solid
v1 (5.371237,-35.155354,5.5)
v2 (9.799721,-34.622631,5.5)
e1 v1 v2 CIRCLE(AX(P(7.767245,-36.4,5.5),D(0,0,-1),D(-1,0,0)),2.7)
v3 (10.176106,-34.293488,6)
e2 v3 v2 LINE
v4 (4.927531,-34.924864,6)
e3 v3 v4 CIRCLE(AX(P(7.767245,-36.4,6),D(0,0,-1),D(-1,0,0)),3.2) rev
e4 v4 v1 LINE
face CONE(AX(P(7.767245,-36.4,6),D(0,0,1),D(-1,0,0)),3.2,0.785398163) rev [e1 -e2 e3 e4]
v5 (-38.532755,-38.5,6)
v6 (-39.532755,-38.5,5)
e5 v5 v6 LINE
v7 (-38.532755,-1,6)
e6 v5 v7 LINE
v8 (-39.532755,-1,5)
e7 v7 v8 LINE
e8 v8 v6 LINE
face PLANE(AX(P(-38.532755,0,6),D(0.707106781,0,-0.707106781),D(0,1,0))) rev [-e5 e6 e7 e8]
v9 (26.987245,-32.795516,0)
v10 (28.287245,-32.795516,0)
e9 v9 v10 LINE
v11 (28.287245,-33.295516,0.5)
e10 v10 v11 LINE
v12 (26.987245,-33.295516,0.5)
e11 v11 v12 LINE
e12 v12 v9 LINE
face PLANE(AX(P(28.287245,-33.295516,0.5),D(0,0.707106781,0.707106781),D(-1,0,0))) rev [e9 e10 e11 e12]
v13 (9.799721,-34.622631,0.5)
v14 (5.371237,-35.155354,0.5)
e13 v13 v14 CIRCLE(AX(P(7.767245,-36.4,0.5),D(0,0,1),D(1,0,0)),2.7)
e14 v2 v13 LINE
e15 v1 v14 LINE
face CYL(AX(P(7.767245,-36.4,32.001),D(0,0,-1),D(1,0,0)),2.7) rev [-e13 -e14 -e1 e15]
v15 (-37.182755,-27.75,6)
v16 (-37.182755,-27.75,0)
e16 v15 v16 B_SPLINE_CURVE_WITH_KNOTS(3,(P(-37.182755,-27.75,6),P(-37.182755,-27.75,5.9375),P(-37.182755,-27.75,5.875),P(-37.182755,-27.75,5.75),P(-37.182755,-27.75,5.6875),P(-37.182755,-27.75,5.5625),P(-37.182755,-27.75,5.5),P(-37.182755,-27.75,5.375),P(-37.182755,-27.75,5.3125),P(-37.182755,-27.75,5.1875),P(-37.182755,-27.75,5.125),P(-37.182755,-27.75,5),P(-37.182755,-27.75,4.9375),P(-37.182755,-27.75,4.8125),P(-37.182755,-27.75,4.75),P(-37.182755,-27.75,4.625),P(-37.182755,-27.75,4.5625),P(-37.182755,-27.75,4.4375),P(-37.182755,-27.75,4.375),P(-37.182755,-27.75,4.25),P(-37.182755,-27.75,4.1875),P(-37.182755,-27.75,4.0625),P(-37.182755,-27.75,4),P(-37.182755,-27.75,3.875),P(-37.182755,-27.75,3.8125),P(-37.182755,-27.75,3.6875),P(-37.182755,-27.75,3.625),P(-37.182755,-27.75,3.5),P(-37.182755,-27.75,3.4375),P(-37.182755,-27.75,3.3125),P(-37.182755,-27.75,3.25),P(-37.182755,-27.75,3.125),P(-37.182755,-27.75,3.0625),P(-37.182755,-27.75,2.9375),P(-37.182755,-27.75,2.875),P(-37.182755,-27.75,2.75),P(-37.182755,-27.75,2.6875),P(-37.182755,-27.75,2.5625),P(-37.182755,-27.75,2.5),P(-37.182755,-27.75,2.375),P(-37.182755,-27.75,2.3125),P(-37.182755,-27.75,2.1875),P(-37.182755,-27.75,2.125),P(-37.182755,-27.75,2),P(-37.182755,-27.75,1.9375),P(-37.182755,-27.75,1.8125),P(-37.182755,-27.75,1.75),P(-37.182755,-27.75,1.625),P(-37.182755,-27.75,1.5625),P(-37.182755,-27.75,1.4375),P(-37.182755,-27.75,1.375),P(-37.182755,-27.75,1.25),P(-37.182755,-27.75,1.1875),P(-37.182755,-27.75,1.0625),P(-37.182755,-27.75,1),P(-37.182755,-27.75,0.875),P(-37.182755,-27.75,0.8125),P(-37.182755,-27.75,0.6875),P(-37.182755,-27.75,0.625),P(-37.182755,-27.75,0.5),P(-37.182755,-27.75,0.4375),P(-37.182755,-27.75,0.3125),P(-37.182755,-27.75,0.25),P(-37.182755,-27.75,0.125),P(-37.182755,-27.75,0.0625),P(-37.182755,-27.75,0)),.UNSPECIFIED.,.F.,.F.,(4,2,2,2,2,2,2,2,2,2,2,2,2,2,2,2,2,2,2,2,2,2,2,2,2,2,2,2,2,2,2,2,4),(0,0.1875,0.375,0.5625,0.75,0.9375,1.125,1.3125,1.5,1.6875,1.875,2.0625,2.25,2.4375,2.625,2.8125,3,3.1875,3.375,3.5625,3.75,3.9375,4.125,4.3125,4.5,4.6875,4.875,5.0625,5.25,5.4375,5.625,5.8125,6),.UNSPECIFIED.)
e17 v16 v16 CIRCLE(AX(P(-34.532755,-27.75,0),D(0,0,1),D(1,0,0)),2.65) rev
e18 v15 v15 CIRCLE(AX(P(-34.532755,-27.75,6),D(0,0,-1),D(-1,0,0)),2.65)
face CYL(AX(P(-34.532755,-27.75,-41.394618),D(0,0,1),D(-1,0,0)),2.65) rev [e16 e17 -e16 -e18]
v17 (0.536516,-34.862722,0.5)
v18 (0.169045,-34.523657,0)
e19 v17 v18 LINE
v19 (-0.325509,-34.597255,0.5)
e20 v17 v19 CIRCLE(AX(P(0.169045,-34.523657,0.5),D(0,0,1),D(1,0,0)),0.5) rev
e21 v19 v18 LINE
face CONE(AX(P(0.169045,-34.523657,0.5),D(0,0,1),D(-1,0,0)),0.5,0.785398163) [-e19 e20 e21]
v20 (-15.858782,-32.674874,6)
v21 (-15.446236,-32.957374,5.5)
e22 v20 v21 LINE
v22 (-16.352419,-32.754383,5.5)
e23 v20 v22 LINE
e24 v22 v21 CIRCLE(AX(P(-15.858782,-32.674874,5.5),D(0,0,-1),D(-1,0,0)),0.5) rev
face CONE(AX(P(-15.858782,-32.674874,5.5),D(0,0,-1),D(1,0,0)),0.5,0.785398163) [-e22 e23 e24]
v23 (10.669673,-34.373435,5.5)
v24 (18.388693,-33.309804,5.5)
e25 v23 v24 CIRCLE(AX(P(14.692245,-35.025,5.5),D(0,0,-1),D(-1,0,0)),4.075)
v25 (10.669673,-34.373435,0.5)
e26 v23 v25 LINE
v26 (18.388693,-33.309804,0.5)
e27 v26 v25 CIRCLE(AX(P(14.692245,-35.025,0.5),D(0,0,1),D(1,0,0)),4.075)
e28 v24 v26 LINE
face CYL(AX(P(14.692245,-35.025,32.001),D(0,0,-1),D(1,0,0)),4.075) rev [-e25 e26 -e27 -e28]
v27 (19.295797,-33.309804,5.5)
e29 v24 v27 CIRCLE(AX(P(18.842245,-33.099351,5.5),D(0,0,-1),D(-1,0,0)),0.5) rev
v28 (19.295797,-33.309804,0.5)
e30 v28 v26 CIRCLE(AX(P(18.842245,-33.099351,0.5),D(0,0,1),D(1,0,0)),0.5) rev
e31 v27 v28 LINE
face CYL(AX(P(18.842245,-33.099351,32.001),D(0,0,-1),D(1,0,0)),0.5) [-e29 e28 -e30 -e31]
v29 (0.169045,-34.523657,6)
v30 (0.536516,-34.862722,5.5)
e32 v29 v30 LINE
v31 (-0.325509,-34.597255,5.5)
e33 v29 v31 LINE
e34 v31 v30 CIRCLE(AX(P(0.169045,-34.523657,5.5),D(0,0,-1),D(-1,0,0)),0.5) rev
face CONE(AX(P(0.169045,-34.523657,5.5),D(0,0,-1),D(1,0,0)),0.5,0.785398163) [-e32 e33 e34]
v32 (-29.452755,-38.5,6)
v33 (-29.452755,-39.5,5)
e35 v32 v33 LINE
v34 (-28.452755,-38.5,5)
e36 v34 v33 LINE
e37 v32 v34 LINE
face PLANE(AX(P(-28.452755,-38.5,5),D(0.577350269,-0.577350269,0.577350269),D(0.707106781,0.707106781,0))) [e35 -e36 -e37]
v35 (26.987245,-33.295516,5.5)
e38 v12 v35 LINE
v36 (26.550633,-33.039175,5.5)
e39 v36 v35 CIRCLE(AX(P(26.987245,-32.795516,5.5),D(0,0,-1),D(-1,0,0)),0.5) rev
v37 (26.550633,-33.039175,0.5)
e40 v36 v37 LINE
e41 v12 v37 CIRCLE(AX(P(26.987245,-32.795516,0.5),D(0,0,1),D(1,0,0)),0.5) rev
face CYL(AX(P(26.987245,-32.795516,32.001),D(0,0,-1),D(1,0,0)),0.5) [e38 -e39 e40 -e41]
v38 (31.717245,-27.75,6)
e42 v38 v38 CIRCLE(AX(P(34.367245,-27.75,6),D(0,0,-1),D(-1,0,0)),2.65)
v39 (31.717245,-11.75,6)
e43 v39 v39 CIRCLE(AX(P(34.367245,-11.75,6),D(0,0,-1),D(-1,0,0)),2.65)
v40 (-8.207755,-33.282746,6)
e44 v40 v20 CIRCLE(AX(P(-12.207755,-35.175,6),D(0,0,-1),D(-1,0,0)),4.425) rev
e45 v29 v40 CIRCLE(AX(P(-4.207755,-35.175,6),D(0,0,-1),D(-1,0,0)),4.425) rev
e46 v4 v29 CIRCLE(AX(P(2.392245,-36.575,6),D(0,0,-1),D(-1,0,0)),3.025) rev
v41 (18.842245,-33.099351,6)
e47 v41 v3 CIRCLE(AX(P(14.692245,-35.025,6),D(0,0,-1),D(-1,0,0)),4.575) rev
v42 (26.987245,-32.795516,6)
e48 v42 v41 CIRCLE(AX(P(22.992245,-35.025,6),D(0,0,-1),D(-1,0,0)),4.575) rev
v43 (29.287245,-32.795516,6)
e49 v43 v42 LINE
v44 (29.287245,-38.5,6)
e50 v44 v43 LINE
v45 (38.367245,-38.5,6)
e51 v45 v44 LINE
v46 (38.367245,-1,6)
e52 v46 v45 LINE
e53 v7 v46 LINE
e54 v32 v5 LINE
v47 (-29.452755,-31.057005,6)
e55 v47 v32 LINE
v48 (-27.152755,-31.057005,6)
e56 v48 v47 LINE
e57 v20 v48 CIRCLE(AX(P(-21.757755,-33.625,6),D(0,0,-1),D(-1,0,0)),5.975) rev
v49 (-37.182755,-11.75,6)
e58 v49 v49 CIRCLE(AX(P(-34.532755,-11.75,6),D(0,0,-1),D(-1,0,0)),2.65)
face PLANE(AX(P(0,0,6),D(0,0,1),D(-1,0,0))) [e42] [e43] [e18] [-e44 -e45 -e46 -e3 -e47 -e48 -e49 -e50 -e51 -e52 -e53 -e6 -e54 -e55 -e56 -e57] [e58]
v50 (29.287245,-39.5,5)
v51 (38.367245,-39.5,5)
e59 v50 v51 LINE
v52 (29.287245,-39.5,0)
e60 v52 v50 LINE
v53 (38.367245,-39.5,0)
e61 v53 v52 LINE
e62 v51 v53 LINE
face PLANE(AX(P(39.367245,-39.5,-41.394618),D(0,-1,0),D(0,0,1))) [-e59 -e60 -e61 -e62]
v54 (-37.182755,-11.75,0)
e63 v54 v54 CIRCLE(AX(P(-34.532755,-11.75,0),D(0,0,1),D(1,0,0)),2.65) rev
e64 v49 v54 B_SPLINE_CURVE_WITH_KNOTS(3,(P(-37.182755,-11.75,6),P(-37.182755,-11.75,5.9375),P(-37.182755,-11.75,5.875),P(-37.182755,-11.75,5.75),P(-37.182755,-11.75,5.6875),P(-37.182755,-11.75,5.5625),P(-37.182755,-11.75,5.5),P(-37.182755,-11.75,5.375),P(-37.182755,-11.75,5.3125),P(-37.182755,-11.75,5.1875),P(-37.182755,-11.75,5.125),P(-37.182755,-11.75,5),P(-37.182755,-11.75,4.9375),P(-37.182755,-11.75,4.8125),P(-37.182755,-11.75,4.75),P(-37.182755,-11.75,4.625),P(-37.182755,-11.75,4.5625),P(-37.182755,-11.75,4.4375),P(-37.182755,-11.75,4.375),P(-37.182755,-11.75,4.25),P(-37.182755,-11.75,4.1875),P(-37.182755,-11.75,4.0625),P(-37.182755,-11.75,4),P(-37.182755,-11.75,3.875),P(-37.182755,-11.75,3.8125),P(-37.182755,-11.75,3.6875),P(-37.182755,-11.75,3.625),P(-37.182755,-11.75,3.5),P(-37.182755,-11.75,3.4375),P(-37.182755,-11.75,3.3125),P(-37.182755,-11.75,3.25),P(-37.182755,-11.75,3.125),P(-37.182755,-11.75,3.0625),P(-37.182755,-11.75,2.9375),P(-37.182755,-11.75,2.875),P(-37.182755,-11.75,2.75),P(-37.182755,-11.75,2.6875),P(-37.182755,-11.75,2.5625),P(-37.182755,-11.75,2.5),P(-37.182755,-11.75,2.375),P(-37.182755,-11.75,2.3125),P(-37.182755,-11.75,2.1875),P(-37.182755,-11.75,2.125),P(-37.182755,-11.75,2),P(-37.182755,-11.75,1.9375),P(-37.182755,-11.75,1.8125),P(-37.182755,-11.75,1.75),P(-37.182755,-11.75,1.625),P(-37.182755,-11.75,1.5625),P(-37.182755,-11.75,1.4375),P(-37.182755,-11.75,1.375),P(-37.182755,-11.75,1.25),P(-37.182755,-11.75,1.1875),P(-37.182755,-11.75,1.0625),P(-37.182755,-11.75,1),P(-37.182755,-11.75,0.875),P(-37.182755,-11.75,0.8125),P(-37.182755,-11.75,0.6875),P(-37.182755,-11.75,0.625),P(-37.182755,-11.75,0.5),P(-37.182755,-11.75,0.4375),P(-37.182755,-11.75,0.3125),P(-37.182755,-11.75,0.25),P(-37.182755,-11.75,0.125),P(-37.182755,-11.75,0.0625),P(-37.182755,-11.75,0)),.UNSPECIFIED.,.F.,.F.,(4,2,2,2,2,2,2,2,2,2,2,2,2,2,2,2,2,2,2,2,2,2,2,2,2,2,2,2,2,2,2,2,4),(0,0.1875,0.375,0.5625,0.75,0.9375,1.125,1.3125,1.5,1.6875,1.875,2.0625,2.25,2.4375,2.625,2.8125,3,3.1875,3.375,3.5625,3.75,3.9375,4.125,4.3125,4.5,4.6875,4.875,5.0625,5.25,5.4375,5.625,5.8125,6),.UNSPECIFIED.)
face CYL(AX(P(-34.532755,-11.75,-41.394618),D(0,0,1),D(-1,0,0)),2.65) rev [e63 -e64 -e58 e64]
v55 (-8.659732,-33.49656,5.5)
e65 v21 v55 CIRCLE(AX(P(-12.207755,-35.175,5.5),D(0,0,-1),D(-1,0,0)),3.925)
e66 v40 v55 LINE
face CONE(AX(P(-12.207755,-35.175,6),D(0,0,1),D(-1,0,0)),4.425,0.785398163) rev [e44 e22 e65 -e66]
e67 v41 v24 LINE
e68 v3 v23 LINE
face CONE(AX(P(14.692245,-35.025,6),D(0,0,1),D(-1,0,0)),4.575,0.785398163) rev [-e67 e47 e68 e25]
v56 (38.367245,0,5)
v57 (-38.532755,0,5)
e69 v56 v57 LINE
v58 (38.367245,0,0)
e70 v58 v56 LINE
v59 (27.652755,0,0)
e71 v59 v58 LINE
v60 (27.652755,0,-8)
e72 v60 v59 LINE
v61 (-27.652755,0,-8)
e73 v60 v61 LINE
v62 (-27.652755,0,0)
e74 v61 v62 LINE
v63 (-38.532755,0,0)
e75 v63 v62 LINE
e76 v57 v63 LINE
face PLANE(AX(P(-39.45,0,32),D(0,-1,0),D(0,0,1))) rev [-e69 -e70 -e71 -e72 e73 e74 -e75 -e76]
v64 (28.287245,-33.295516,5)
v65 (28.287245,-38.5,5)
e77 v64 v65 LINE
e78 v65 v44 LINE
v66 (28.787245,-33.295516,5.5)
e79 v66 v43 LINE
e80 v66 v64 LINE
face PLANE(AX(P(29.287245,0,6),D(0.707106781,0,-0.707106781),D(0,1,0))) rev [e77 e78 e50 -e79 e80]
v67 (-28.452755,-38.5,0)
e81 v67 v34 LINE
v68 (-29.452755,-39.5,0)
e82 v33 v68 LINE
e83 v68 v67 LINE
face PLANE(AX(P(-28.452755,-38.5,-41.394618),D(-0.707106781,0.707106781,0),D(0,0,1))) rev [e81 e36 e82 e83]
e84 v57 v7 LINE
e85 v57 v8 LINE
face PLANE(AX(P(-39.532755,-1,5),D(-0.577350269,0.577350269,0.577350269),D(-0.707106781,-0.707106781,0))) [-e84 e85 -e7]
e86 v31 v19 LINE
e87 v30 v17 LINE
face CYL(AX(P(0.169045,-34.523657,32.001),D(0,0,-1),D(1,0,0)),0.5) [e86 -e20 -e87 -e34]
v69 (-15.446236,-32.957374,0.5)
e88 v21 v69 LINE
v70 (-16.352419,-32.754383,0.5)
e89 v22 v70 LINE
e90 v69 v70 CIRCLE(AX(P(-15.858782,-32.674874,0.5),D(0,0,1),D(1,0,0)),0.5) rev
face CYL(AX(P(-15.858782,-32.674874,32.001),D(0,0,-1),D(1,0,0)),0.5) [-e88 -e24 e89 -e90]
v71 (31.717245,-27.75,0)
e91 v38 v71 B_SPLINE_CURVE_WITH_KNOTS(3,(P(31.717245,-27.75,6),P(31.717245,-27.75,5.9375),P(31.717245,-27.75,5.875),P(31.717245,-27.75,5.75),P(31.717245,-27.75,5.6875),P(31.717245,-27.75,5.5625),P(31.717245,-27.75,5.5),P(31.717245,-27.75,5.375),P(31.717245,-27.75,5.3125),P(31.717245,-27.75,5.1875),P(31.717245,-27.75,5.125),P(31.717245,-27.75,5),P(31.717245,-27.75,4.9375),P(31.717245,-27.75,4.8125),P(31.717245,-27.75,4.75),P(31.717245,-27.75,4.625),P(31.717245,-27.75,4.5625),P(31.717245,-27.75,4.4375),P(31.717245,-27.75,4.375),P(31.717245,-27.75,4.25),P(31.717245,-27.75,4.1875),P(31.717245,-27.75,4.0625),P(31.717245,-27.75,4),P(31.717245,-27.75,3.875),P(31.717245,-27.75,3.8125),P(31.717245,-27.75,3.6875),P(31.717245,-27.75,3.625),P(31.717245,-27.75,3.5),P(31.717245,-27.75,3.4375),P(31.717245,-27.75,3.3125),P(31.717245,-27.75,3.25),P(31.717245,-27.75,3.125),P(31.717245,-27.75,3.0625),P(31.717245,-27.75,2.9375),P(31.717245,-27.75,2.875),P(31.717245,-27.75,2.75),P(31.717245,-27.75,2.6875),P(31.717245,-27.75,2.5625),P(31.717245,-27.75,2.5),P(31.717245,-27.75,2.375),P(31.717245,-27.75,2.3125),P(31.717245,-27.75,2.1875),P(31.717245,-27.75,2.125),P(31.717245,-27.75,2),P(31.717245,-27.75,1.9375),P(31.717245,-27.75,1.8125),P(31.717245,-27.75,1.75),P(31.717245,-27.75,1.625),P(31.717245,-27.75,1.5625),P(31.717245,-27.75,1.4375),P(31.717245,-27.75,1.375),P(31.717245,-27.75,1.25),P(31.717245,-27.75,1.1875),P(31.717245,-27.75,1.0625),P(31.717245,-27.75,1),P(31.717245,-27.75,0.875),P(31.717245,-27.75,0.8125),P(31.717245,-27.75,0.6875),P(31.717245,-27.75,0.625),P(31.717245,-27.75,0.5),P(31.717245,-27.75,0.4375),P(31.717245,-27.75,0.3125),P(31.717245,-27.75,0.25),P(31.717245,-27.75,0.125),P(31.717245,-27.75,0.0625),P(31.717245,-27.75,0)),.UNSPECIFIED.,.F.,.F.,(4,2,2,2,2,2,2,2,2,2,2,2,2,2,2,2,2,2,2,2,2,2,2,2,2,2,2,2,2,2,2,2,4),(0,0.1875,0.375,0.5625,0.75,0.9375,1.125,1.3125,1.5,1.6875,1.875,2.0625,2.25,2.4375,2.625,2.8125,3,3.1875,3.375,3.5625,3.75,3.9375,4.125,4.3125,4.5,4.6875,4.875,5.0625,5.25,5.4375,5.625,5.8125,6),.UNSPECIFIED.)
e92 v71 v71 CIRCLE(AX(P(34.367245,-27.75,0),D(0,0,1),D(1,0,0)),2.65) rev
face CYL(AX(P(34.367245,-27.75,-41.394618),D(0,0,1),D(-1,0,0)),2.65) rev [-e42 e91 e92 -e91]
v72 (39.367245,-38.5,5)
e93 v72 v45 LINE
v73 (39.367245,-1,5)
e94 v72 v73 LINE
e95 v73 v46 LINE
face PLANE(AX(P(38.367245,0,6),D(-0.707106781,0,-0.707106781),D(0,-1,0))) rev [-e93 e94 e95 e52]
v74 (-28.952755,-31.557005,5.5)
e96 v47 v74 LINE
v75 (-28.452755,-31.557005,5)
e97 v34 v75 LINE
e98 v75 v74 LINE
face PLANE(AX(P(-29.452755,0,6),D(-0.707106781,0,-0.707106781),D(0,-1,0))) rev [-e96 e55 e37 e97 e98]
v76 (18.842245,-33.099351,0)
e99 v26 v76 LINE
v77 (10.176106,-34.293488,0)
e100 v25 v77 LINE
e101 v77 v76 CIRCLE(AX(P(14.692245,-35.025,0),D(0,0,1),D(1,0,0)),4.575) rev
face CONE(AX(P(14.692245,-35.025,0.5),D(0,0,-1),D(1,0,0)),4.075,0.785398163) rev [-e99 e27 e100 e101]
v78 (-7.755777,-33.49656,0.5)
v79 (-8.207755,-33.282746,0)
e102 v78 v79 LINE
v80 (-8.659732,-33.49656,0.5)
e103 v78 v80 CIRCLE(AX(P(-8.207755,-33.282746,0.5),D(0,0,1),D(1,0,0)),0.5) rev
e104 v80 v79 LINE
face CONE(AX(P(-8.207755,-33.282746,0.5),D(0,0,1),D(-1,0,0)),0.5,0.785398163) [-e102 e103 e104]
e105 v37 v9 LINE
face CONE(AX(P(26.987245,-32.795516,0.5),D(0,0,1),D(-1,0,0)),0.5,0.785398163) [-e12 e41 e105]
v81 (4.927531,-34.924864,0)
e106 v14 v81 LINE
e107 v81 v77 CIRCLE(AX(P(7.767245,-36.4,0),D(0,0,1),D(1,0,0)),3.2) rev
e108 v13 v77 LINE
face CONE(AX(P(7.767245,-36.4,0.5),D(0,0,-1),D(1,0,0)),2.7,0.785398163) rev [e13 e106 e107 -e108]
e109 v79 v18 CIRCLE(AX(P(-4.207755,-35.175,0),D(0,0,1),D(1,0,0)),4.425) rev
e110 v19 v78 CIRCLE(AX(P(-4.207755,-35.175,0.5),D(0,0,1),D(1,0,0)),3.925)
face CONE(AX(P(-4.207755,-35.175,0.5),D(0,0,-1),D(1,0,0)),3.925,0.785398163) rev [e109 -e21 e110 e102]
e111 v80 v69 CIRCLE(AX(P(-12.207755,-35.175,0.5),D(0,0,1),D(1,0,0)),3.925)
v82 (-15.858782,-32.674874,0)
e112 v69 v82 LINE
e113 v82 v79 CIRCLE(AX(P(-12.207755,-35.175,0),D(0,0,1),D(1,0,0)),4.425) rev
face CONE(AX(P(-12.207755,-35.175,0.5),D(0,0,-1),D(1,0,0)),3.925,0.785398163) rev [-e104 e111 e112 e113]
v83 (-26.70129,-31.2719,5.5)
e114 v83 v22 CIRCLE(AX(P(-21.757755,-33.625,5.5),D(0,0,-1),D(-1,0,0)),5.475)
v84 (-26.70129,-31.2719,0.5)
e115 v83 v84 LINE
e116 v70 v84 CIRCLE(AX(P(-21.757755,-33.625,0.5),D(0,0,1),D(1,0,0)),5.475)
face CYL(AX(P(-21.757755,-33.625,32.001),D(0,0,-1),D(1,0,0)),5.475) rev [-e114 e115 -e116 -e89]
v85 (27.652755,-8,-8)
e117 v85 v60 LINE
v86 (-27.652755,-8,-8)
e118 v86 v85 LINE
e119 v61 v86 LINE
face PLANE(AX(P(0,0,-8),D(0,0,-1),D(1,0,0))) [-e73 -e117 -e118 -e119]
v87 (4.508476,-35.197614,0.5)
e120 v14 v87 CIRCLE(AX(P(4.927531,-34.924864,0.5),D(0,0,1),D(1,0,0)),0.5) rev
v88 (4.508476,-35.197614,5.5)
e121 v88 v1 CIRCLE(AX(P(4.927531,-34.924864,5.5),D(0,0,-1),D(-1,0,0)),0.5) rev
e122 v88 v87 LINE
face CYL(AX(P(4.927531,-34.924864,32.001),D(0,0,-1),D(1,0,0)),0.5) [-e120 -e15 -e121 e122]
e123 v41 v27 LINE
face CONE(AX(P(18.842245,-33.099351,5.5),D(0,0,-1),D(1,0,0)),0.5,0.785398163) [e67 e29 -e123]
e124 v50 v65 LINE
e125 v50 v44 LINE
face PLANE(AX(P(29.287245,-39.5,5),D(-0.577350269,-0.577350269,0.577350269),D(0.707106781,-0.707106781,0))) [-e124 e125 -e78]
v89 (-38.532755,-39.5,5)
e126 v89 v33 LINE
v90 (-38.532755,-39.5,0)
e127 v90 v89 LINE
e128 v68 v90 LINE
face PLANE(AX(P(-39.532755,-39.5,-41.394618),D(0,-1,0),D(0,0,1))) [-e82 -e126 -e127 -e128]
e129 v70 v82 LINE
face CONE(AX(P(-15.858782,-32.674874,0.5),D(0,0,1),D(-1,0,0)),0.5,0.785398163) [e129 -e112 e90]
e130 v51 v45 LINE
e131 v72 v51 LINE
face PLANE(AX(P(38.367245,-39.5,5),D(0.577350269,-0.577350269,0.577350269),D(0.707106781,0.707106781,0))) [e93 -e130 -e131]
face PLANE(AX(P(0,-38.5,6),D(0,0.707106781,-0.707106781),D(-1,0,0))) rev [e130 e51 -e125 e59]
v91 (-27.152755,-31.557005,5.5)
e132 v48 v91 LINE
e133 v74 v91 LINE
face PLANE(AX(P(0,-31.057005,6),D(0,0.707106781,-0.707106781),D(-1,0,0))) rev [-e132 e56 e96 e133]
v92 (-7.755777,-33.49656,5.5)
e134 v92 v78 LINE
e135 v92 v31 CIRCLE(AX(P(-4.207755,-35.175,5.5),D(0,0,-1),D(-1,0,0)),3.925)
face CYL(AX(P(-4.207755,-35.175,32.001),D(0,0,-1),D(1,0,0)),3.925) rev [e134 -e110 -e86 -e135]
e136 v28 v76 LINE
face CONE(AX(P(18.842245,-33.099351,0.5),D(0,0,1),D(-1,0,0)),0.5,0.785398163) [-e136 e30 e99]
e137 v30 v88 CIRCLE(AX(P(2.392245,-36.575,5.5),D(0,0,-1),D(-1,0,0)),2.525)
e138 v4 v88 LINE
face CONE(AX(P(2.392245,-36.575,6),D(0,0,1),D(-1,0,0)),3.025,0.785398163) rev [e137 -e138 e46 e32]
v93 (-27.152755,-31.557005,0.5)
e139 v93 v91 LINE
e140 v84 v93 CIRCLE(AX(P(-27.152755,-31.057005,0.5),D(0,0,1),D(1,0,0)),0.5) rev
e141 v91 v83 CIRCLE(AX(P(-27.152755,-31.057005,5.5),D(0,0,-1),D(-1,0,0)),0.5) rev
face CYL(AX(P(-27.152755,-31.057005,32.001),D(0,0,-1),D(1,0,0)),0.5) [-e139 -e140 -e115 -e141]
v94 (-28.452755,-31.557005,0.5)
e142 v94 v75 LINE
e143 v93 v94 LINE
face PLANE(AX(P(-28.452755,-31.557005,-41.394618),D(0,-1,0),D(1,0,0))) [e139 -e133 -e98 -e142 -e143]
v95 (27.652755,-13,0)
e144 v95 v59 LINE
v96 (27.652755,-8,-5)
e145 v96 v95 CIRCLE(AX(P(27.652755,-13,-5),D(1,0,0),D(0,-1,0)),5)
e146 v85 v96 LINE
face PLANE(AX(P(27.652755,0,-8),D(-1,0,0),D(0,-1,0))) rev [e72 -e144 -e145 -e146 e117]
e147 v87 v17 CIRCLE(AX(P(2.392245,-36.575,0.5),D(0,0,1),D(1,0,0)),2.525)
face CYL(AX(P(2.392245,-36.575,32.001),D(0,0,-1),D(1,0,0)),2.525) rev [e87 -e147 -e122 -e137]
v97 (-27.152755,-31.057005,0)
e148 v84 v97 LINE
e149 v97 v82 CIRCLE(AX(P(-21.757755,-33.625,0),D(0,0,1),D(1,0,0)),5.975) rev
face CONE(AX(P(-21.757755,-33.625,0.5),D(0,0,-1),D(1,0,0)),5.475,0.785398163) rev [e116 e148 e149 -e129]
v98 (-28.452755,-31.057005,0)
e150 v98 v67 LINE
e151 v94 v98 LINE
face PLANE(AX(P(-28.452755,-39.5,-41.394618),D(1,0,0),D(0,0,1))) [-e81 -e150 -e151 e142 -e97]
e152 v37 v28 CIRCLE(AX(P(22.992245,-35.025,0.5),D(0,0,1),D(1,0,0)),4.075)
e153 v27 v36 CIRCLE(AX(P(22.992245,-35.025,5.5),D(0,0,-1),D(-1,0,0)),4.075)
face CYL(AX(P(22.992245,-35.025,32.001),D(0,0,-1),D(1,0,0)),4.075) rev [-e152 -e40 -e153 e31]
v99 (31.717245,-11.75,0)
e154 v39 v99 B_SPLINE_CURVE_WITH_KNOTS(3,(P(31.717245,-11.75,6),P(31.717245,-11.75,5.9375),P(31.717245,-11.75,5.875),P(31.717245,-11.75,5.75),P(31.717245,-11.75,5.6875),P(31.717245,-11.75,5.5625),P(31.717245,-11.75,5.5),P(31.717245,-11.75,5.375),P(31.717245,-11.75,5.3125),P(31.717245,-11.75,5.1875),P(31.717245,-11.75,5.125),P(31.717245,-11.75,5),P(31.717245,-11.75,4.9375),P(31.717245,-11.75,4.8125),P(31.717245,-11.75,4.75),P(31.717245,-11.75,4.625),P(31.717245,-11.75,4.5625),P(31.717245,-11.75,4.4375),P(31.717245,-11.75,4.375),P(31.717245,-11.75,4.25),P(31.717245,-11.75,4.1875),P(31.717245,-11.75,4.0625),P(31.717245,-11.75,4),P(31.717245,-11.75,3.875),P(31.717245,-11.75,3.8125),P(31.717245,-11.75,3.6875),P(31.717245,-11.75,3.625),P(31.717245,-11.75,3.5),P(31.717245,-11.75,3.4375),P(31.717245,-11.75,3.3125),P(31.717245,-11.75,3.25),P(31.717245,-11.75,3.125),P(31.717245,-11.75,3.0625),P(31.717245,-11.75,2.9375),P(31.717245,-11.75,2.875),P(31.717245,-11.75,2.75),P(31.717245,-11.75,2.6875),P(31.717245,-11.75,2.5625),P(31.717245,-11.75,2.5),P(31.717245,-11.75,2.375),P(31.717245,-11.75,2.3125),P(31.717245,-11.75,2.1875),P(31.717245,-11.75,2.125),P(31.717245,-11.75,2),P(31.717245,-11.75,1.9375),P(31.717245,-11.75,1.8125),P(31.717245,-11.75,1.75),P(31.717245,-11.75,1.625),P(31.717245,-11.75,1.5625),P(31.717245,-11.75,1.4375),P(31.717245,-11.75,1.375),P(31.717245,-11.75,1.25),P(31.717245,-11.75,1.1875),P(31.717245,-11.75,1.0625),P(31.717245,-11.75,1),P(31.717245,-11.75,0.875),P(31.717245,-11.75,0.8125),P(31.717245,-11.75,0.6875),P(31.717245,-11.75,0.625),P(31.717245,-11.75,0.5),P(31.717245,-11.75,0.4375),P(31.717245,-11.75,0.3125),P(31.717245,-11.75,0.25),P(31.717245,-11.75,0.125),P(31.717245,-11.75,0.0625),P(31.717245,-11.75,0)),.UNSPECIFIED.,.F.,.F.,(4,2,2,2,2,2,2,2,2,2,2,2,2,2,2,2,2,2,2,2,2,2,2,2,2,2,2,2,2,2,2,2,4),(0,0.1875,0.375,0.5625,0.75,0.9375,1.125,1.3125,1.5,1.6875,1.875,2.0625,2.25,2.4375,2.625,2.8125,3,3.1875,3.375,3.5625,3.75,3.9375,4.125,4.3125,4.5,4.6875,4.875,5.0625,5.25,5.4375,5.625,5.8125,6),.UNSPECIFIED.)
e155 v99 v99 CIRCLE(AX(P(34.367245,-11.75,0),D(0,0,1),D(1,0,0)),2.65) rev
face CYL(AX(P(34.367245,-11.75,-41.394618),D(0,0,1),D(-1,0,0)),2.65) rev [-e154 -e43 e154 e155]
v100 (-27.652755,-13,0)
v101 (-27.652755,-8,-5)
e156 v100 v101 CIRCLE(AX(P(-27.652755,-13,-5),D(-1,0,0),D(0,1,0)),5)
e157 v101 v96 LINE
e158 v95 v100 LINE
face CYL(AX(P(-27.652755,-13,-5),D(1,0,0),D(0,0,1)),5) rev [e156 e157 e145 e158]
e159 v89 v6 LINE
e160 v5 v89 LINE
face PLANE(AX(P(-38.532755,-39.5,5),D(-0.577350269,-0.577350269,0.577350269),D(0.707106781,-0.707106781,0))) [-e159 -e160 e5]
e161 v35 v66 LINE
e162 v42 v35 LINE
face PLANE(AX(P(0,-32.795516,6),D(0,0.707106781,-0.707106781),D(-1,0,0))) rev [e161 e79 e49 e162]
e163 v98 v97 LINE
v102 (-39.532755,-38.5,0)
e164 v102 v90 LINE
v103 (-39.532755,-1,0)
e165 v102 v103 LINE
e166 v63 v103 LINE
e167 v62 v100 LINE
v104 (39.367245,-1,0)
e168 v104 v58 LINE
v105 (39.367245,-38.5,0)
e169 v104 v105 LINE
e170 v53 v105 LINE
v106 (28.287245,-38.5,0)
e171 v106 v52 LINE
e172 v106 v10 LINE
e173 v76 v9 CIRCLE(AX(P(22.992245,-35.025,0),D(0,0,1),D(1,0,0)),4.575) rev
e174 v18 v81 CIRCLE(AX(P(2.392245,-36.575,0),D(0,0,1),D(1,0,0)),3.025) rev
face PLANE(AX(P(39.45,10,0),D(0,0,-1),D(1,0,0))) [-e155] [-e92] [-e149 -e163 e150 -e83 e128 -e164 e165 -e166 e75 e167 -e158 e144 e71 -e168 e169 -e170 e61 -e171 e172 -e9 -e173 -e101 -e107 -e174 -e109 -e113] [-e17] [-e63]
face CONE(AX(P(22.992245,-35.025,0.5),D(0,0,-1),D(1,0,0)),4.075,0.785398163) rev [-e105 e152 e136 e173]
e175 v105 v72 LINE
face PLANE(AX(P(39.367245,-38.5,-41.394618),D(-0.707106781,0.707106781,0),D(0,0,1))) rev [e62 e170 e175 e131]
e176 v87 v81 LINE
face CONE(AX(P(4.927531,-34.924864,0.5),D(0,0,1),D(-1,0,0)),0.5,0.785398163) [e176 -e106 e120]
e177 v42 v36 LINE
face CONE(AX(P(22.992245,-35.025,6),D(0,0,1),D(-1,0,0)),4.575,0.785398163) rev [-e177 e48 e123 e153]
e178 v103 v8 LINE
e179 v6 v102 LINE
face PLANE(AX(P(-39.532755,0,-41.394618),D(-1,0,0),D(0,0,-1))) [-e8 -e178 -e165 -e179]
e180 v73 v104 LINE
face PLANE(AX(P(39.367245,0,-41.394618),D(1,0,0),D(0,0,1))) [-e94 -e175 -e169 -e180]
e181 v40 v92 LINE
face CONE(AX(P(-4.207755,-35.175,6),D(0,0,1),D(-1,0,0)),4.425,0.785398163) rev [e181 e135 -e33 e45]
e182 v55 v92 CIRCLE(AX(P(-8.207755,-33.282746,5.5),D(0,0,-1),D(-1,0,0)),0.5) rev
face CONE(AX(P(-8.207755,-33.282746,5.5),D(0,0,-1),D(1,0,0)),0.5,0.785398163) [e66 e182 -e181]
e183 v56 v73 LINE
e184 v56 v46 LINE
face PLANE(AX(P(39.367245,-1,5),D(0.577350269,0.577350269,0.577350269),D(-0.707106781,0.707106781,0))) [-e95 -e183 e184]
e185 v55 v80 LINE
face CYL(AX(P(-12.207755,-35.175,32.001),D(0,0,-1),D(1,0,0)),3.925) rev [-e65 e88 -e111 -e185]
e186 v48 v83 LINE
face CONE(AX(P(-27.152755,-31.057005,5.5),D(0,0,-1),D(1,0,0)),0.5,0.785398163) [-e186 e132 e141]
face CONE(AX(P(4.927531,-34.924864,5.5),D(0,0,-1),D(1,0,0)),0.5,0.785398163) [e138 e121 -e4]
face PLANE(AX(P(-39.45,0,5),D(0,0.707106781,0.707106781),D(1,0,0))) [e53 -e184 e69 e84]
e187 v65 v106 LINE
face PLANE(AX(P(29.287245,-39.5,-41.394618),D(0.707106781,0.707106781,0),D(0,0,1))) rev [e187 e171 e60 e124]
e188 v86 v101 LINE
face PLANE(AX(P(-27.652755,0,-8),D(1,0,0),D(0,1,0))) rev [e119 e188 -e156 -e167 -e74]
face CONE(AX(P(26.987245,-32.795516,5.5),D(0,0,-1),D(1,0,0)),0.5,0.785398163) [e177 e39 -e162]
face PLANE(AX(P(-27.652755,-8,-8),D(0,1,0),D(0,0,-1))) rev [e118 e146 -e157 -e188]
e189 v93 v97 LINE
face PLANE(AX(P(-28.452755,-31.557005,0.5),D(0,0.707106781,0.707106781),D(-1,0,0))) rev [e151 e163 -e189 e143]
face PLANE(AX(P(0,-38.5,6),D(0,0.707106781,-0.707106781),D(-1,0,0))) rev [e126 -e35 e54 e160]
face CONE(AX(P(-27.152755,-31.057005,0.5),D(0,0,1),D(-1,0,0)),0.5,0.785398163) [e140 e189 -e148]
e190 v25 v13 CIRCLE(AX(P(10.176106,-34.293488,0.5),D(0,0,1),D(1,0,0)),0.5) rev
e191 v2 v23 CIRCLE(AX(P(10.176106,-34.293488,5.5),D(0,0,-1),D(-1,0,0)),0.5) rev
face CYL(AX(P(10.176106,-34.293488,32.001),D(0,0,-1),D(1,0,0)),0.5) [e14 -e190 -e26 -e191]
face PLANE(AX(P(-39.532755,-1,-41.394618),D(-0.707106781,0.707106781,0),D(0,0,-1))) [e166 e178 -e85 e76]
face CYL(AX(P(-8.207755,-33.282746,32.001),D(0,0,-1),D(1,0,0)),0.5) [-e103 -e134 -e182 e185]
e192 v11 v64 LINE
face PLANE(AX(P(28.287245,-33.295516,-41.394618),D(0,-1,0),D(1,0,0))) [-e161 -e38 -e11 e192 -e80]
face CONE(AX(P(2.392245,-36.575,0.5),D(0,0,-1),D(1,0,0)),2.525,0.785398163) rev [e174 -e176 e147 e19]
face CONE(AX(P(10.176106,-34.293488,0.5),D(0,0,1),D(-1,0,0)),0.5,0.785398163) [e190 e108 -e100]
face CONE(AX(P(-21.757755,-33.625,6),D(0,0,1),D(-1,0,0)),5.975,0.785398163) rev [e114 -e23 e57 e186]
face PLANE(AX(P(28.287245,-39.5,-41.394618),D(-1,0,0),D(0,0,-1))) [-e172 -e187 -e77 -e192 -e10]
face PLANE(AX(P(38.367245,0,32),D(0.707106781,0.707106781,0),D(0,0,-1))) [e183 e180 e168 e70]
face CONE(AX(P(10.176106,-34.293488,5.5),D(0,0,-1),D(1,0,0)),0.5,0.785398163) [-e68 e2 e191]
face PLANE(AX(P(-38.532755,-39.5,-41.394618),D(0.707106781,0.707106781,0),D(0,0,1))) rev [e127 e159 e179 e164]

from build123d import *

# Parameters (mm, degrees)
SKETCH3_W           = 78.9
SKETCH3_H           = 32
BOSS_EXTRUDE1_DEPTH = 10
SKETCH3_4_R         = 2.375
CUT_EXTRUDE1_DEPTH  = 8
SKETCH4_W           = 55.14
SKETCH4_H           = 39
BOSS_EXTRUDE2_DEPTH = 6
CUT_EXTRUDE2_REACH  = 66.041
SKETCH9_W           = 78.9
SKETCH9_H           = 10
CUT_EXTRUDE4_DEPTH  = 62.929181295
BOSS_EXTRUDE4_START = -6
SKETCH10_R          = 2.65
BOSS_EXTRUDE4_DEPTH = 6
SKETCH11_W          = 55.305509596
SKETCH11_H          = 8
BOSS_EXTRUDE5_DEPTH = 8
FILLET2_R           = 5
CHAMFER3_SIZE       = 1
CHAMFER4_SIZE       = 0.5


with BuildPart() as part:
    # Sketch3 → Boss-Extrude1 (new body)
    with BuildSketch(Plane(origin=(0, 0, 0), x_dir=(1, 0, 0), z_dir=(0, 1, 0))):
        with Locations((0, 16)):
            Rectangle(SKETCH3_W, SKETCH3_H)
    extrude(amount=BOSS_EXTRUDE1_DEPTH)

    # Sketch3<4> → Cut-Extrude1 (cut)
    with BuildSketch(Plane(origin=(0, 0, 0), x_dir=(1, 0, 0), z_dir=(0, 1, 0))):
        with Locations(Location((-34.45, 9.5, 0), (0, 0, 270))):
            Circle(SKETCH3_4_R)
        with Locations(Location((34.45, 9.5, 0), (0, 0, 270))):
            Circle(SKETCH3_4_R)
        with Locations(Location((-34.45, 25.5, 0), (0, 0, 270))):
            Circle(SKETCH3_4_R)
        with Locations(Location((34.45, 25.5, 0), (0, 0, 270))):
            Circle(SKETCH3_4_R)
    extrude(amount=CUT_EXTRUDE1_DEPTH, mode=Mode.SUBTRACT)

    # Sketch4 → Boss-Extrude2 (add)
    with BuildSketch(Plane.XY):
        with Locations((-0.082754798, -19.5)):
            Rectangle(SKETCH4_W, SKETCH4_H)
    extrude(amount=-BOSS_EXTRUDE2_DEPTH)

    # Sketch6 → Cut-Extrude2 (cut, up to next)
    with BuildSketch(Plane.XY, mode=Mode.PRIVATE) as cut_extrude2_sk1:
        with BuildLine():
            Line((-27.652754798, -39), (27.487245202, -39))
            Line((27.487245202, -39), (27.487245202, -32.795515755))
            ThreePointArc((27.487245202, -32.795515755), (27.113130048, -33.279409344), (26.55063318, -33.039175235))
            ThreePointArc((26.55063318, -33.039175235), (22.840340095, -30.952832292), (19.295797115, -33.309804228))
            ThreePointArc((19.295797115, -33.309804228), (18.842245202, -33.599350759), (18.388693289, -33.309804228))
            ThreePointArc((18.388693289, -33.309804228), (14.135992665, -30.988143783), (10.669672877, -34.373435048))
            ThreePointArc((10.669672877, -34.373435048), (10.313792265, -34.774157145), (9.799721264, -34.622630861))
            ThreePointArc((9.799721264, -34.622630861), (7.44477434, -33.719326103), (5.371236745, -35.155354078))
            ThreePointArc((5.371236745, -35.155354078), (4.951993147, -35.42426536), (4.508475892, -35.197613829))
            ThreePointArc((4.508475892, -35.197613829), (2.60438519, -34.058927341), (0.536516234, -34.862722278))
            ThreePointArc((0.536516234, -34.862722278), (0.021886532, -35.001511273), (-0.325508515, -34.597255418))
            ThreePointArc((-0.325508515, -34.597255418), (-3.632594875, -31.292369955), (-7.755777397, -33.496560058))
            ThreePointArc((-7.755777397, -33.496560058), (-8.207754798, -33.782746053), (-8.659732199, -33.496560058))
            ThreePointArc((-8.659732199, -33.496560058), (-11.896894258, -31.262329464), (-15.446236111, -32.95737429))
            ThreePointArc((-15.446236111, -32.95737429), (-15.968076529, -33.16278259), (-16.352419433, -32.754382635))
            ThreePointArc((-16.352419433, -32.754382635), (-20.981382663, -28.205325535), (-26.701290363, -31.271899679))
            ThreePointArc((-26.701290363, -31.271899679), (-27.262908741, -31.544719865), (-27.652754798, -31.057004673))
            Line((-27.652754798, -31.057004673), (-27.652754798, -39))
        make_face()
    cut_extrude2_tool1 = extrude(cut_extrude2_sk1.sketch, amount=-CUT_EXTRUDE2_REACH, mode=Mode.PRIVATE) & part.part
    add(cut_extrude2_tool1.solids().sort_by_distance((-1.936265, -35.219125, 0))[0], mode=Mode.SUBTRACT)

    # Sketch9 → Cut-Extrude4 (cut, through all)
    with BuildSketch(Plane.XY):
        with Locations((0, 5)):
            Rectangle(SKETCH9_W, SKETCH9_H)
    extrude(amount=-CUT_EXTRUDE4_DEPTH, mode=Mode.SUBTRACT)

    # Sketch10 → Boss-Extrude4 (add)
    # profile 1 of 2: a face of its own
    with BuildSketch(Plane(origin=(0, 0, -6), x_dir=(-1, 0, 0), z_dir=(0, 0, -1)).offset(BOSS_EXTRUDE4_START)):
        with BuildLine():
            Line((-27.487245202, 0), (-39.367245202, 0))
            Line((-39.367245202, 0), (-39.367245202, -39.5))
            Line((-39.367245202, -39.5), (-28.287245202, -39.5))
            Line((-28.287245202, -39.5), (-28.287245202, -33.295515755))
            Line((-28.287245202, -33.295515755), (-26.987245202, -33.295515755))
            ThreePointArc((-26.987245202, -33.295515755), (-27.340798593, -33.149069145), (-27.487245202, -32.795515755))
            Line((-27.487245202, -32.795515755), (-27.487245202, 0))
        make_face()
        with Locations((-34.367245202, -11.75)):
            Circle(SKETCH10_R, mode=Mode.SUBTRACT)
        with Locations((-34.367245202, -27.75)):
            Circle(SKETCH10_R, mode=Mode.SUBTRACT)
    # profile 2 of 2: a face of its own
    with BuildSketch(Plane(origin=(0, 0, -6), x_dir=(-1, 0, 0), z_dir=(0, 0, -1)).offset(BOSS_EXTRUDE4_START)):
        with BuildLine():
            Line((27.652754798, 0), (39.532754798, 0))
            Line((39.532754798, 0), (39.532754798, -39.5))
            Line((39.532754798, -39.5), (28.452754798, -39.5))
            Line((28.452754798, -39.5), (28.452754798, -31.557004673))
            Line((28.452754798, -31.557004673), (27.152754798, -31.557004673))
            ThreePointArc((27.152754798, -31.557004673), (27.506308189, -31.410558063), (27.652754798, -31.057004673))
            Line((27.652754798, -31.057004673), (27.652754798, 0))
        make_face()
        with Locations((34.532754798, -11.75)):
            Circle(SKETCH10_R, mode=Mode.SUBTRACT)
        with Locations((34.532754798, -27.75)):
            Circle(SKETCH10_R, mode=Mode.SUBTRACT)
    extrude(amount=BOSS_EXTRUDE4_DEPTH)

    # Sketch11 → Boss-Extrude5 (add)
    with BuildSketch(Plane.XY):
        with Locations((0, -4)):
            Rectangle(SKETCH11_W, SKETCH11_H)
    extrude(amount=BOSS_EXTRUDE5_DEPTH)

    # Fillet2
    fillet2_edges = [part.edges().sort_by_distance(p)[0] for p in [
        (0, -8, 0),
    ]]
    fillet(fillet2_edges, radius=FILLET2_R)

    # Chamfer3
    chamfer3_edges = [part.edges().sort_by_distance(p)[0] for p in [
        (28.287245202, -39.5, -3),
        (39.367245202, -39.5, -3),
        (39.367245202, 0, -3),
        (39.367245202, -19.75, -6),
        (33.827245202, -39.5, -6),
        (28.287245202, -36.397757877, -6),
        (-39.532754798, 0, -3),
        (-39.532754798, -39.5, -3),
        (-28.452754798, -39.5, -3),
        (-28.452754798, -35.528502336, -6),
        (-33.992754798, -39.5, -6),
        (-39.532754798, -19.75, -6),
        (-0.082754798, 0, -6),
    ]]
    chamfer(chamfer3_edges, length=CHAMFER3_SIZE)

    # Chamfer4
    chamfer4_edges = [part.edges().sort_by_distance(p)[0] for p in [
        (26.734094792, -33.226694221, 0),
        (26.734094792, -33.226694221, -6),
        (27.637245202, -33.295515755, 0),
        (28.137245202, -33.295515755, -6),
        (-27.802754798, -31.557004673, 0),
        (-28.302754798, -31.557004673, -6),
        (-15.968076529, -33.16278259, -6),
        (-11.896894258, -31.262329464, -6),
        (-8.207754798, -33.782746053, -6),
        (-3.632594875, -31.292369955, -6),
        (0.021886532, -35.001511273, -6),
        (2.60438519, -34.058927341, -6),
        (4.951993147, -35.42426536, -6),
        (7.44477434, -33.719326103, -6),
        (10.313792265, -34.774157145, -6),
        (14.135992665, -30.988143783, -6),
        (18.842245202, -33.599350759, -6),
        (22.840340095, -30.952832292, -6),
        (-26.885778679, -31.479761993, -6),
        (-20.981382663, -28.205325535, -6),
        (-15.968076529, -33.16278259, 0),
        (-20.981382663, -28.205325535, 0),
        (-26.885778679, -31.479761993, 0),
        (22.840340095, -30.952832292, 0),
        (18.842245202, -33.599350759, 0),
        (14.135992665, -30.988143783, 0),
        (10.313792265, -34.774157145, 0),
        (7.44477434, -33.719326103, 0),
        (4.951993147, -35.42426536, 0),
        (2.60438519, -34.058927341, 0),
        (0.021886532, -35.001511273, 0),
        (-3.632594875, -31.292369955, 0),
        (-8.207754798, -33.782746053, 0),
        (-11.896894258, -31.262329464, 0),
    ]]
    chamfer(chamfer4_edges, length=CHAMFER4_SIZE - 0.0001)  # a hair under: the kernel refuses the full size


with BuildPart() as body_2:
    # Mirror1: mirrored copy
    add(part.part.mirror(Plane(origin=(39.45, 10, 0), x_dir=(1, 0, 0), z_dir=(0, 0, 1))))


solid = body_2.part
